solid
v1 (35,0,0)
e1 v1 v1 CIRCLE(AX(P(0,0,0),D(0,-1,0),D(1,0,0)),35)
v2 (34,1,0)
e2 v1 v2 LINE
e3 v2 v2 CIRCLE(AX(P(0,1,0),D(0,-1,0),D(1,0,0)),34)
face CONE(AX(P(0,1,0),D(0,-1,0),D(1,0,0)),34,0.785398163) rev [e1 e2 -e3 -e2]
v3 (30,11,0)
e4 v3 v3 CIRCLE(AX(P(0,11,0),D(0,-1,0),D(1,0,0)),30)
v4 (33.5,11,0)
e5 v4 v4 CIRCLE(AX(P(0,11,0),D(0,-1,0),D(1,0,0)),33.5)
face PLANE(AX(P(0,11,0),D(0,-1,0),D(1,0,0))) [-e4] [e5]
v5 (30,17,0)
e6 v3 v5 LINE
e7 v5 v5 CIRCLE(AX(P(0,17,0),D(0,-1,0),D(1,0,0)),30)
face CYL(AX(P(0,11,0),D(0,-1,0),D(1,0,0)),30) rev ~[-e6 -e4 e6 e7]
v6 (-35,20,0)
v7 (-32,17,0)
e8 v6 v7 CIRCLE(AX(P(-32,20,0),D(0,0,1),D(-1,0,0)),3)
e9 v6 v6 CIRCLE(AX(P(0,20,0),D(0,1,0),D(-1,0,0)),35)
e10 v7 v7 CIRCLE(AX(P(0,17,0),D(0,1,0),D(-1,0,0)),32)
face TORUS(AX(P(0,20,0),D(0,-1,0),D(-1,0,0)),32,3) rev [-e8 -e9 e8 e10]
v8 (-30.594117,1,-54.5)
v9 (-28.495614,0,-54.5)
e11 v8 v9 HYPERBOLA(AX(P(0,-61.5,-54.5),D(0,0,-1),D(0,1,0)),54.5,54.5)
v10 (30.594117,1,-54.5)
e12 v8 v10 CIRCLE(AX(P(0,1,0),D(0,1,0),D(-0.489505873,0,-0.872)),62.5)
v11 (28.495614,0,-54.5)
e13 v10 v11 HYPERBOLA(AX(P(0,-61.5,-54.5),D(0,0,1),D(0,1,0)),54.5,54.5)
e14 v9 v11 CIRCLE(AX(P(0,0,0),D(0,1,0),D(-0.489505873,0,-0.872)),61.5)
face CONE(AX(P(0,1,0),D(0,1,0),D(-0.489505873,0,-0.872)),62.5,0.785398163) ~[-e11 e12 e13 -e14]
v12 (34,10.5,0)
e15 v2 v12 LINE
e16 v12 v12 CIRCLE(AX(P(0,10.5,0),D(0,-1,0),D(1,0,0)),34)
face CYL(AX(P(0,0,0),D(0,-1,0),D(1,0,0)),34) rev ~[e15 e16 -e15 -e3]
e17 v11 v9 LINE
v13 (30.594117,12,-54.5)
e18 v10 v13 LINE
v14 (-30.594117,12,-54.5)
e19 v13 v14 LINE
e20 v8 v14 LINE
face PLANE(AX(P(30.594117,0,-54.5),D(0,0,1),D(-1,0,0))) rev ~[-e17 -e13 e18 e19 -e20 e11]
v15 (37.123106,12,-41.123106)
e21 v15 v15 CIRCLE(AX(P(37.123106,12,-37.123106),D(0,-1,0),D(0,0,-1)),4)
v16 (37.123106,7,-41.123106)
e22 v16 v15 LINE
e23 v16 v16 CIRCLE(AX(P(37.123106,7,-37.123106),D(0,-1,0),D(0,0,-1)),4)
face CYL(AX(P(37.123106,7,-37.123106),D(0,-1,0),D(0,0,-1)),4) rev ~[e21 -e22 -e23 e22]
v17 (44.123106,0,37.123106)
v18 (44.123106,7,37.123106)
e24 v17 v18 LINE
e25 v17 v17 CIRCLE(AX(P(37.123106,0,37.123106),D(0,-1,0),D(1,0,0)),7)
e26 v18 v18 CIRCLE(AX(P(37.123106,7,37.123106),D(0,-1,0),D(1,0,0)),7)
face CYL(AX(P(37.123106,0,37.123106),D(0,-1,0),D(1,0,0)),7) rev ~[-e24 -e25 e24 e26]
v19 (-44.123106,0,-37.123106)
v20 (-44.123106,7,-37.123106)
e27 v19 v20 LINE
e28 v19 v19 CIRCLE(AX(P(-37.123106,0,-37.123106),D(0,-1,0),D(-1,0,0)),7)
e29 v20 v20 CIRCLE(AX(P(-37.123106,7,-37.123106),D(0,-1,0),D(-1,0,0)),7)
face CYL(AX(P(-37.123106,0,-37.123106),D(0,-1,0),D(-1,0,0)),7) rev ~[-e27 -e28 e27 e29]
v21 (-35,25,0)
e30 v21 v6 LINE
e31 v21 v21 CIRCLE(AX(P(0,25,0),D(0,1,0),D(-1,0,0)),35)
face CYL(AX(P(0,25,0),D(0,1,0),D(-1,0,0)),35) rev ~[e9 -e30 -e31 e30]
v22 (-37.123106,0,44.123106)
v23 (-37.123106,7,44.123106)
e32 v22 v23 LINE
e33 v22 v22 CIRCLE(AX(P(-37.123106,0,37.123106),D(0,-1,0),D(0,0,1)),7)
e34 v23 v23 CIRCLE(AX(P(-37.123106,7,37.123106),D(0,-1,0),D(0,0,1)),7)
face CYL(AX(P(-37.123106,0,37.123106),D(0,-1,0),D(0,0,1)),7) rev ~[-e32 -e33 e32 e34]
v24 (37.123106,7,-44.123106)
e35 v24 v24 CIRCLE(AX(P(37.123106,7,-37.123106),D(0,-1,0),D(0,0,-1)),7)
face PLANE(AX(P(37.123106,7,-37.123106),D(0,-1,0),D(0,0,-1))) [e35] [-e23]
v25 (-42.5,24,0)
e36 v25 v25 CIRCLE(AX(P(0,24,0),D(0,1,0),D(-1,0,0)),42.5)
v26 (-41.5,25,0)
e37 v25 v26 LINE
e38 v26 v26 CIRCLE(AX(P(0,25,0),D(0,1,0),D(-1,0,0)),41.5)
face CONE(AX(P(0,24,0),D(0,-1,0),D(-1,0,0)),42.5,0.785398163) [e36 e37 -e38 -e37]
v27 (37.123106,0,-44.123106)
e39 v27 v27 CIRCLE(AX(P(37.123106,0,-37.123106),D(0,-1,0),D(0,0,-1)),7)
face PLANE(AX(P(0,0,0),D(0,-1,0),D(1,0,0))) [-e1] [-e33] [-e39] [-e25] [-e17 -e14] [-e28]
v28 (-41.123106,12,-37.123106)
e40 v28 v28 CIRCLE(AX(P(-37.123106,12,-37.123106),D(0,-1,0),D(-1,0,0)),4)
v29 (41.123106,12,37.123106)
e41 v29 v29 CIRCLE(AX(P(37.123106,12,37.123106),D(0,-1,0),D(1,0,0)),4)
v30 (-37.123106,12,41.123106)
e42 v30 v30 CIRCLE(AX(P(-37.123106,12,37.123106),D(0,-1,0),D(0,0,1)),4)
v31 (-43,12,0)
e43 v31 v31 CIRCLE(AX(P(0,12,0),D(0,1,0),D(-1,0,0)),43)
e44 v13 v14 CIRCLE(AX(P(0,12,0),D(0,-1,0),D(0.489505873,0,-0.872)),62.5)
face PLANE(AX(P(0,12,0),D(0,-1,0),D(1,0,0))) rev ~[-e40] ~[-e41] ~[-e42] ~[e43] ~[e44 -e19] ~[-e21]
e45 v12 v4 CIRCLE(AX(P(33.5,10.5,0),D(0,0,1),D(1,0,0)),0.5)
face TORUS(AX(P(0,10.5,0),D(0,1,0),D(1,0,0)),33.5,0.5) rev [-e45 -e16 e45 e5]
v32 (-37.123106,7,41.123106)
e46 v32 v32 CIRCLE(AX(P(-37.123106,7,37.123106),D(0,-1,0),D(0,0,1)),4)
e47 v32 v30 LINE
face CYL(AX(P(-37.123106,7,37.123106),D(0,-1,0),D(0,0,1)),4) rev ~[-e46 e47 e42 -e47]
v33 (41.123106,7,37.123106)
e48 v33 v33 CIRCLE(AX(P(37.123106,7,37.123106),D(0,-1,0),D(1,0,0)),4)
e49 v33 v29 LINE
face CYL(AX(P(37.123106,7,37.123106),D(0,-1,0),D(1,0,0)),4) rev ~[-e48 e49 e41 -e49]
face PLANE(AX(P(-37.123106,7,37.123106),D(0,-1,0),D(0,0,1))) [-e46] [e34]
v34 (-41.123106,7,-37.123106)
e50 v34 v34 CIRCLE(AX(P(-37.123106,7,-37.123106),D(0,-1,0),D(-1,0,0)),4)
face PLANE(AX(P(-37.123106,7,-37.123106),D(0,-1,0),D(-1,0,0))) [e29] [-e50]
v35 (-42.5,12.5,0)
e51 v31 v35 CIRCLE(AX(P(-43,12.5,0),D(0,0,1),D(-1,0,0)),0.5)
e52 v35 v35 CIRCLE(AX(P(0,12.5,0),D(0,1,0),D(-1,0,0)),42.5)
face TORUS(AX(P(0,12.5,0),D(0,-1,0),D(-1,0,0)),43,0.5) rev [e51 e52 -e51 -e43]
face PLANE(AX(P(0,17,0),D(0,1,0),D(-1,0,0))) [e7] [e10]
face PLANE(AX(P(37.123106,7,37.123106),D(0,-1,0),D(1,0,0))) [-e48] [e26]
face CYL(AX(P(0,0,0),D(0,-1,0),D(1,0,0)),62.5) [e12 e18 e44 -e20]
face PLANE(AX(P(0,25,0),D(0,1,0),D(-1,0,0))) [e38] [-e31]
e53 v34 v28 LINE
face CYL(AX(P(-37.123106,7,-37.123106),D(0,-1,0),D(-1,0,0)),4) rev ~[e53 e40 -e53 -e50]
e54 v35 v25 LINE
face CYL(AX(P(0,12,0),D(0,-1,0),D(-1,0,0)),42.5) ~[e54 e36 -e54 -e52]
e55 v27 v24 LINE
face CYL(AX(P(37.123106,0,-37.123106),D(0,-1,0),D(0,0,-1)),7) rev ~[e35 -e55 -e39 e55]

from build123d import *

# Parameters (mm, degrees)
F0_R            = 62.5
F1_DEPTH        = 12
F2_R            = 7
F3_DEPTH        = 7
F3_COPIES_COUNT = 4
F4_R            = 4
F5_DEPTH        = 25
F5_COPIES_COUNT = 4
F7_DEPTH        = 25
F8_R            = 42.5
F9_DEPTH        = 13
F10_R           = 35
F11_DEPTH       = 8
F12_R           = 34
F13_DEPTH       = 11
F14_R           = 30
F15_DEPTH       = 25
F16_SIZE        = 1
F17_R           = 0.5
F18_R           = 3


# Not quite as in the source:
# - a pattern or mirror of a feature is missing from the dataset's text; its kind, count and spacing are read off the source's solid


with BuildPart() as f1:
    # F0 (on Front) → F1 (new body)
    with BuildSketch(Plane.XZ):
        Circle(F0_R)
    extrude(amount=-F1_DEPTH)

    # F2 (on face) → F3 (cut)
    with BuildSketch(Plane.XZ):
        with Locations((37.1231060123, 37.1231060123)):
            Circle(F2_R)
    f3 = extrude(amount=-F3_DEPTH, mode=Mode.SUBTRACT)

    # F3_copies: F3 ×4 about axis
    f3_copies_axis = Axis((0, 0, 0), (0, 1, 0))
    for i in range(1, F3_COPIES_COUNT):
        add(f3.rotate(f3_copies_axis, i * 360 / F3_COPIES_COUNT), mode=Mode.SUBTRACT)

    # F4 (on face) → F5 (cut)
    with BuildSketch(Plane.XZ.offset(-7)):
        with Locations((37.1231060123, 37.1231060123)):
            Circle(F4_R)
    f5 = extrude(amount=-F5_DEPTH, mode=Mode.SUBTRACT)

    # F5_copies: F5 ×4 about axis
    f5_copies_axis = Axis((0, 0, 0), (0, 1, 0))
    for i in range(1, F5_COPIES_COUNT):
        add(f5.rotate(f5_copies_axis, i * 360 / F5_COPIES_COUNT), mode=Mode.SUBTRACT)

    # F6 (on face) → F7 (cut)
    with BuildSketch(Plane.XZ):
        with BuildLine():
            Line((30.5941170816, -54.5), (-30.5941170816, -54.5))
            ThreePointArc((-30.5941170816, -54.5), (0, -62.5), (30.5941170816, -54.5))
        make_face()
    extrude(amount=-F7_DEPTH, mode=Mode.SUBTRACT)

    # F8 (on face) → F9 (join)
    with BuildSketch(Plane(origin=(0, 12, 0), x_dir=(-1, 0, 0), z_dir=(0, 1, 0))):
        Circle(F8_R)
    extrude(amount=F9_DEPTH)

    # F10 (on face) → F11 (cut)
    with BuildSketch(Plane(origin=(0, 25, 0), x_dir=(-1, 0, 0), z_dir=(0, 1, 0))):
        Circle(F10_R)
    extrude(amount=-F11_DEPTH, mode=Mode.SUBTRACT)

    # F12 (on face) → F13 (cut)
    with BuildSketch(Plane.XZ):
        Circle(F12_R)
    extrude(amount=-F13_DEPTH, mode=Mode.SUBTRACT)

    # F14 (on face) → F15 (cut)
    with BuildSketch(Plane.XZ.offset(-11)):
        Circle(F14_R)
    extrude(amount=-F15_DEPTH, mode=Mode.SUBTRACT)

    # F16
    f16_edges = [f1.edges().sort_by_distance(p)[0] for p in [
        (0, 0, 62.5),
        (-34, 0, 0),
        (42.5, 25, 0),
    ]]
    chamfer(f16_edges, length=F16_SIZE)

    # F17
    f17_edges = [f1.edges().sort_by_distance(p)[0] for p in [
        (-34, 11, 0),
        (42.5, 12, 0),
    ]]
    fillet(f17_edges, radius=F17_R)

    # F18
    f18_edges = [f1.edges().sort_by_distance(p)[0] for p in [
        (35, 17, 0),
    ]]
    fillet(f18_edges, radius=F18_R)


with BuildPart() as f20:
    # F19 (on Top) → F20 (revolve)
    with BuildSketch(Plane.XY):
        with BuildLine():
            Line((23, 17), (23, 0))
            Line((23, 0), (34, 0))
            Line((34, 0), (34, 10.5))
            ThreePointArc((34, 10.5), (33.8535533906, 10.8535533906), (33.5, 11))
            Line((33.5, 11), (30, 11))
            Line((30, 11), (30, 17))
            Line((30, 17), (23, 17))
        make_face()
    revolve(axis=Axis((0, 0, 0), (0, -1, 0)))


solid = f1.part
